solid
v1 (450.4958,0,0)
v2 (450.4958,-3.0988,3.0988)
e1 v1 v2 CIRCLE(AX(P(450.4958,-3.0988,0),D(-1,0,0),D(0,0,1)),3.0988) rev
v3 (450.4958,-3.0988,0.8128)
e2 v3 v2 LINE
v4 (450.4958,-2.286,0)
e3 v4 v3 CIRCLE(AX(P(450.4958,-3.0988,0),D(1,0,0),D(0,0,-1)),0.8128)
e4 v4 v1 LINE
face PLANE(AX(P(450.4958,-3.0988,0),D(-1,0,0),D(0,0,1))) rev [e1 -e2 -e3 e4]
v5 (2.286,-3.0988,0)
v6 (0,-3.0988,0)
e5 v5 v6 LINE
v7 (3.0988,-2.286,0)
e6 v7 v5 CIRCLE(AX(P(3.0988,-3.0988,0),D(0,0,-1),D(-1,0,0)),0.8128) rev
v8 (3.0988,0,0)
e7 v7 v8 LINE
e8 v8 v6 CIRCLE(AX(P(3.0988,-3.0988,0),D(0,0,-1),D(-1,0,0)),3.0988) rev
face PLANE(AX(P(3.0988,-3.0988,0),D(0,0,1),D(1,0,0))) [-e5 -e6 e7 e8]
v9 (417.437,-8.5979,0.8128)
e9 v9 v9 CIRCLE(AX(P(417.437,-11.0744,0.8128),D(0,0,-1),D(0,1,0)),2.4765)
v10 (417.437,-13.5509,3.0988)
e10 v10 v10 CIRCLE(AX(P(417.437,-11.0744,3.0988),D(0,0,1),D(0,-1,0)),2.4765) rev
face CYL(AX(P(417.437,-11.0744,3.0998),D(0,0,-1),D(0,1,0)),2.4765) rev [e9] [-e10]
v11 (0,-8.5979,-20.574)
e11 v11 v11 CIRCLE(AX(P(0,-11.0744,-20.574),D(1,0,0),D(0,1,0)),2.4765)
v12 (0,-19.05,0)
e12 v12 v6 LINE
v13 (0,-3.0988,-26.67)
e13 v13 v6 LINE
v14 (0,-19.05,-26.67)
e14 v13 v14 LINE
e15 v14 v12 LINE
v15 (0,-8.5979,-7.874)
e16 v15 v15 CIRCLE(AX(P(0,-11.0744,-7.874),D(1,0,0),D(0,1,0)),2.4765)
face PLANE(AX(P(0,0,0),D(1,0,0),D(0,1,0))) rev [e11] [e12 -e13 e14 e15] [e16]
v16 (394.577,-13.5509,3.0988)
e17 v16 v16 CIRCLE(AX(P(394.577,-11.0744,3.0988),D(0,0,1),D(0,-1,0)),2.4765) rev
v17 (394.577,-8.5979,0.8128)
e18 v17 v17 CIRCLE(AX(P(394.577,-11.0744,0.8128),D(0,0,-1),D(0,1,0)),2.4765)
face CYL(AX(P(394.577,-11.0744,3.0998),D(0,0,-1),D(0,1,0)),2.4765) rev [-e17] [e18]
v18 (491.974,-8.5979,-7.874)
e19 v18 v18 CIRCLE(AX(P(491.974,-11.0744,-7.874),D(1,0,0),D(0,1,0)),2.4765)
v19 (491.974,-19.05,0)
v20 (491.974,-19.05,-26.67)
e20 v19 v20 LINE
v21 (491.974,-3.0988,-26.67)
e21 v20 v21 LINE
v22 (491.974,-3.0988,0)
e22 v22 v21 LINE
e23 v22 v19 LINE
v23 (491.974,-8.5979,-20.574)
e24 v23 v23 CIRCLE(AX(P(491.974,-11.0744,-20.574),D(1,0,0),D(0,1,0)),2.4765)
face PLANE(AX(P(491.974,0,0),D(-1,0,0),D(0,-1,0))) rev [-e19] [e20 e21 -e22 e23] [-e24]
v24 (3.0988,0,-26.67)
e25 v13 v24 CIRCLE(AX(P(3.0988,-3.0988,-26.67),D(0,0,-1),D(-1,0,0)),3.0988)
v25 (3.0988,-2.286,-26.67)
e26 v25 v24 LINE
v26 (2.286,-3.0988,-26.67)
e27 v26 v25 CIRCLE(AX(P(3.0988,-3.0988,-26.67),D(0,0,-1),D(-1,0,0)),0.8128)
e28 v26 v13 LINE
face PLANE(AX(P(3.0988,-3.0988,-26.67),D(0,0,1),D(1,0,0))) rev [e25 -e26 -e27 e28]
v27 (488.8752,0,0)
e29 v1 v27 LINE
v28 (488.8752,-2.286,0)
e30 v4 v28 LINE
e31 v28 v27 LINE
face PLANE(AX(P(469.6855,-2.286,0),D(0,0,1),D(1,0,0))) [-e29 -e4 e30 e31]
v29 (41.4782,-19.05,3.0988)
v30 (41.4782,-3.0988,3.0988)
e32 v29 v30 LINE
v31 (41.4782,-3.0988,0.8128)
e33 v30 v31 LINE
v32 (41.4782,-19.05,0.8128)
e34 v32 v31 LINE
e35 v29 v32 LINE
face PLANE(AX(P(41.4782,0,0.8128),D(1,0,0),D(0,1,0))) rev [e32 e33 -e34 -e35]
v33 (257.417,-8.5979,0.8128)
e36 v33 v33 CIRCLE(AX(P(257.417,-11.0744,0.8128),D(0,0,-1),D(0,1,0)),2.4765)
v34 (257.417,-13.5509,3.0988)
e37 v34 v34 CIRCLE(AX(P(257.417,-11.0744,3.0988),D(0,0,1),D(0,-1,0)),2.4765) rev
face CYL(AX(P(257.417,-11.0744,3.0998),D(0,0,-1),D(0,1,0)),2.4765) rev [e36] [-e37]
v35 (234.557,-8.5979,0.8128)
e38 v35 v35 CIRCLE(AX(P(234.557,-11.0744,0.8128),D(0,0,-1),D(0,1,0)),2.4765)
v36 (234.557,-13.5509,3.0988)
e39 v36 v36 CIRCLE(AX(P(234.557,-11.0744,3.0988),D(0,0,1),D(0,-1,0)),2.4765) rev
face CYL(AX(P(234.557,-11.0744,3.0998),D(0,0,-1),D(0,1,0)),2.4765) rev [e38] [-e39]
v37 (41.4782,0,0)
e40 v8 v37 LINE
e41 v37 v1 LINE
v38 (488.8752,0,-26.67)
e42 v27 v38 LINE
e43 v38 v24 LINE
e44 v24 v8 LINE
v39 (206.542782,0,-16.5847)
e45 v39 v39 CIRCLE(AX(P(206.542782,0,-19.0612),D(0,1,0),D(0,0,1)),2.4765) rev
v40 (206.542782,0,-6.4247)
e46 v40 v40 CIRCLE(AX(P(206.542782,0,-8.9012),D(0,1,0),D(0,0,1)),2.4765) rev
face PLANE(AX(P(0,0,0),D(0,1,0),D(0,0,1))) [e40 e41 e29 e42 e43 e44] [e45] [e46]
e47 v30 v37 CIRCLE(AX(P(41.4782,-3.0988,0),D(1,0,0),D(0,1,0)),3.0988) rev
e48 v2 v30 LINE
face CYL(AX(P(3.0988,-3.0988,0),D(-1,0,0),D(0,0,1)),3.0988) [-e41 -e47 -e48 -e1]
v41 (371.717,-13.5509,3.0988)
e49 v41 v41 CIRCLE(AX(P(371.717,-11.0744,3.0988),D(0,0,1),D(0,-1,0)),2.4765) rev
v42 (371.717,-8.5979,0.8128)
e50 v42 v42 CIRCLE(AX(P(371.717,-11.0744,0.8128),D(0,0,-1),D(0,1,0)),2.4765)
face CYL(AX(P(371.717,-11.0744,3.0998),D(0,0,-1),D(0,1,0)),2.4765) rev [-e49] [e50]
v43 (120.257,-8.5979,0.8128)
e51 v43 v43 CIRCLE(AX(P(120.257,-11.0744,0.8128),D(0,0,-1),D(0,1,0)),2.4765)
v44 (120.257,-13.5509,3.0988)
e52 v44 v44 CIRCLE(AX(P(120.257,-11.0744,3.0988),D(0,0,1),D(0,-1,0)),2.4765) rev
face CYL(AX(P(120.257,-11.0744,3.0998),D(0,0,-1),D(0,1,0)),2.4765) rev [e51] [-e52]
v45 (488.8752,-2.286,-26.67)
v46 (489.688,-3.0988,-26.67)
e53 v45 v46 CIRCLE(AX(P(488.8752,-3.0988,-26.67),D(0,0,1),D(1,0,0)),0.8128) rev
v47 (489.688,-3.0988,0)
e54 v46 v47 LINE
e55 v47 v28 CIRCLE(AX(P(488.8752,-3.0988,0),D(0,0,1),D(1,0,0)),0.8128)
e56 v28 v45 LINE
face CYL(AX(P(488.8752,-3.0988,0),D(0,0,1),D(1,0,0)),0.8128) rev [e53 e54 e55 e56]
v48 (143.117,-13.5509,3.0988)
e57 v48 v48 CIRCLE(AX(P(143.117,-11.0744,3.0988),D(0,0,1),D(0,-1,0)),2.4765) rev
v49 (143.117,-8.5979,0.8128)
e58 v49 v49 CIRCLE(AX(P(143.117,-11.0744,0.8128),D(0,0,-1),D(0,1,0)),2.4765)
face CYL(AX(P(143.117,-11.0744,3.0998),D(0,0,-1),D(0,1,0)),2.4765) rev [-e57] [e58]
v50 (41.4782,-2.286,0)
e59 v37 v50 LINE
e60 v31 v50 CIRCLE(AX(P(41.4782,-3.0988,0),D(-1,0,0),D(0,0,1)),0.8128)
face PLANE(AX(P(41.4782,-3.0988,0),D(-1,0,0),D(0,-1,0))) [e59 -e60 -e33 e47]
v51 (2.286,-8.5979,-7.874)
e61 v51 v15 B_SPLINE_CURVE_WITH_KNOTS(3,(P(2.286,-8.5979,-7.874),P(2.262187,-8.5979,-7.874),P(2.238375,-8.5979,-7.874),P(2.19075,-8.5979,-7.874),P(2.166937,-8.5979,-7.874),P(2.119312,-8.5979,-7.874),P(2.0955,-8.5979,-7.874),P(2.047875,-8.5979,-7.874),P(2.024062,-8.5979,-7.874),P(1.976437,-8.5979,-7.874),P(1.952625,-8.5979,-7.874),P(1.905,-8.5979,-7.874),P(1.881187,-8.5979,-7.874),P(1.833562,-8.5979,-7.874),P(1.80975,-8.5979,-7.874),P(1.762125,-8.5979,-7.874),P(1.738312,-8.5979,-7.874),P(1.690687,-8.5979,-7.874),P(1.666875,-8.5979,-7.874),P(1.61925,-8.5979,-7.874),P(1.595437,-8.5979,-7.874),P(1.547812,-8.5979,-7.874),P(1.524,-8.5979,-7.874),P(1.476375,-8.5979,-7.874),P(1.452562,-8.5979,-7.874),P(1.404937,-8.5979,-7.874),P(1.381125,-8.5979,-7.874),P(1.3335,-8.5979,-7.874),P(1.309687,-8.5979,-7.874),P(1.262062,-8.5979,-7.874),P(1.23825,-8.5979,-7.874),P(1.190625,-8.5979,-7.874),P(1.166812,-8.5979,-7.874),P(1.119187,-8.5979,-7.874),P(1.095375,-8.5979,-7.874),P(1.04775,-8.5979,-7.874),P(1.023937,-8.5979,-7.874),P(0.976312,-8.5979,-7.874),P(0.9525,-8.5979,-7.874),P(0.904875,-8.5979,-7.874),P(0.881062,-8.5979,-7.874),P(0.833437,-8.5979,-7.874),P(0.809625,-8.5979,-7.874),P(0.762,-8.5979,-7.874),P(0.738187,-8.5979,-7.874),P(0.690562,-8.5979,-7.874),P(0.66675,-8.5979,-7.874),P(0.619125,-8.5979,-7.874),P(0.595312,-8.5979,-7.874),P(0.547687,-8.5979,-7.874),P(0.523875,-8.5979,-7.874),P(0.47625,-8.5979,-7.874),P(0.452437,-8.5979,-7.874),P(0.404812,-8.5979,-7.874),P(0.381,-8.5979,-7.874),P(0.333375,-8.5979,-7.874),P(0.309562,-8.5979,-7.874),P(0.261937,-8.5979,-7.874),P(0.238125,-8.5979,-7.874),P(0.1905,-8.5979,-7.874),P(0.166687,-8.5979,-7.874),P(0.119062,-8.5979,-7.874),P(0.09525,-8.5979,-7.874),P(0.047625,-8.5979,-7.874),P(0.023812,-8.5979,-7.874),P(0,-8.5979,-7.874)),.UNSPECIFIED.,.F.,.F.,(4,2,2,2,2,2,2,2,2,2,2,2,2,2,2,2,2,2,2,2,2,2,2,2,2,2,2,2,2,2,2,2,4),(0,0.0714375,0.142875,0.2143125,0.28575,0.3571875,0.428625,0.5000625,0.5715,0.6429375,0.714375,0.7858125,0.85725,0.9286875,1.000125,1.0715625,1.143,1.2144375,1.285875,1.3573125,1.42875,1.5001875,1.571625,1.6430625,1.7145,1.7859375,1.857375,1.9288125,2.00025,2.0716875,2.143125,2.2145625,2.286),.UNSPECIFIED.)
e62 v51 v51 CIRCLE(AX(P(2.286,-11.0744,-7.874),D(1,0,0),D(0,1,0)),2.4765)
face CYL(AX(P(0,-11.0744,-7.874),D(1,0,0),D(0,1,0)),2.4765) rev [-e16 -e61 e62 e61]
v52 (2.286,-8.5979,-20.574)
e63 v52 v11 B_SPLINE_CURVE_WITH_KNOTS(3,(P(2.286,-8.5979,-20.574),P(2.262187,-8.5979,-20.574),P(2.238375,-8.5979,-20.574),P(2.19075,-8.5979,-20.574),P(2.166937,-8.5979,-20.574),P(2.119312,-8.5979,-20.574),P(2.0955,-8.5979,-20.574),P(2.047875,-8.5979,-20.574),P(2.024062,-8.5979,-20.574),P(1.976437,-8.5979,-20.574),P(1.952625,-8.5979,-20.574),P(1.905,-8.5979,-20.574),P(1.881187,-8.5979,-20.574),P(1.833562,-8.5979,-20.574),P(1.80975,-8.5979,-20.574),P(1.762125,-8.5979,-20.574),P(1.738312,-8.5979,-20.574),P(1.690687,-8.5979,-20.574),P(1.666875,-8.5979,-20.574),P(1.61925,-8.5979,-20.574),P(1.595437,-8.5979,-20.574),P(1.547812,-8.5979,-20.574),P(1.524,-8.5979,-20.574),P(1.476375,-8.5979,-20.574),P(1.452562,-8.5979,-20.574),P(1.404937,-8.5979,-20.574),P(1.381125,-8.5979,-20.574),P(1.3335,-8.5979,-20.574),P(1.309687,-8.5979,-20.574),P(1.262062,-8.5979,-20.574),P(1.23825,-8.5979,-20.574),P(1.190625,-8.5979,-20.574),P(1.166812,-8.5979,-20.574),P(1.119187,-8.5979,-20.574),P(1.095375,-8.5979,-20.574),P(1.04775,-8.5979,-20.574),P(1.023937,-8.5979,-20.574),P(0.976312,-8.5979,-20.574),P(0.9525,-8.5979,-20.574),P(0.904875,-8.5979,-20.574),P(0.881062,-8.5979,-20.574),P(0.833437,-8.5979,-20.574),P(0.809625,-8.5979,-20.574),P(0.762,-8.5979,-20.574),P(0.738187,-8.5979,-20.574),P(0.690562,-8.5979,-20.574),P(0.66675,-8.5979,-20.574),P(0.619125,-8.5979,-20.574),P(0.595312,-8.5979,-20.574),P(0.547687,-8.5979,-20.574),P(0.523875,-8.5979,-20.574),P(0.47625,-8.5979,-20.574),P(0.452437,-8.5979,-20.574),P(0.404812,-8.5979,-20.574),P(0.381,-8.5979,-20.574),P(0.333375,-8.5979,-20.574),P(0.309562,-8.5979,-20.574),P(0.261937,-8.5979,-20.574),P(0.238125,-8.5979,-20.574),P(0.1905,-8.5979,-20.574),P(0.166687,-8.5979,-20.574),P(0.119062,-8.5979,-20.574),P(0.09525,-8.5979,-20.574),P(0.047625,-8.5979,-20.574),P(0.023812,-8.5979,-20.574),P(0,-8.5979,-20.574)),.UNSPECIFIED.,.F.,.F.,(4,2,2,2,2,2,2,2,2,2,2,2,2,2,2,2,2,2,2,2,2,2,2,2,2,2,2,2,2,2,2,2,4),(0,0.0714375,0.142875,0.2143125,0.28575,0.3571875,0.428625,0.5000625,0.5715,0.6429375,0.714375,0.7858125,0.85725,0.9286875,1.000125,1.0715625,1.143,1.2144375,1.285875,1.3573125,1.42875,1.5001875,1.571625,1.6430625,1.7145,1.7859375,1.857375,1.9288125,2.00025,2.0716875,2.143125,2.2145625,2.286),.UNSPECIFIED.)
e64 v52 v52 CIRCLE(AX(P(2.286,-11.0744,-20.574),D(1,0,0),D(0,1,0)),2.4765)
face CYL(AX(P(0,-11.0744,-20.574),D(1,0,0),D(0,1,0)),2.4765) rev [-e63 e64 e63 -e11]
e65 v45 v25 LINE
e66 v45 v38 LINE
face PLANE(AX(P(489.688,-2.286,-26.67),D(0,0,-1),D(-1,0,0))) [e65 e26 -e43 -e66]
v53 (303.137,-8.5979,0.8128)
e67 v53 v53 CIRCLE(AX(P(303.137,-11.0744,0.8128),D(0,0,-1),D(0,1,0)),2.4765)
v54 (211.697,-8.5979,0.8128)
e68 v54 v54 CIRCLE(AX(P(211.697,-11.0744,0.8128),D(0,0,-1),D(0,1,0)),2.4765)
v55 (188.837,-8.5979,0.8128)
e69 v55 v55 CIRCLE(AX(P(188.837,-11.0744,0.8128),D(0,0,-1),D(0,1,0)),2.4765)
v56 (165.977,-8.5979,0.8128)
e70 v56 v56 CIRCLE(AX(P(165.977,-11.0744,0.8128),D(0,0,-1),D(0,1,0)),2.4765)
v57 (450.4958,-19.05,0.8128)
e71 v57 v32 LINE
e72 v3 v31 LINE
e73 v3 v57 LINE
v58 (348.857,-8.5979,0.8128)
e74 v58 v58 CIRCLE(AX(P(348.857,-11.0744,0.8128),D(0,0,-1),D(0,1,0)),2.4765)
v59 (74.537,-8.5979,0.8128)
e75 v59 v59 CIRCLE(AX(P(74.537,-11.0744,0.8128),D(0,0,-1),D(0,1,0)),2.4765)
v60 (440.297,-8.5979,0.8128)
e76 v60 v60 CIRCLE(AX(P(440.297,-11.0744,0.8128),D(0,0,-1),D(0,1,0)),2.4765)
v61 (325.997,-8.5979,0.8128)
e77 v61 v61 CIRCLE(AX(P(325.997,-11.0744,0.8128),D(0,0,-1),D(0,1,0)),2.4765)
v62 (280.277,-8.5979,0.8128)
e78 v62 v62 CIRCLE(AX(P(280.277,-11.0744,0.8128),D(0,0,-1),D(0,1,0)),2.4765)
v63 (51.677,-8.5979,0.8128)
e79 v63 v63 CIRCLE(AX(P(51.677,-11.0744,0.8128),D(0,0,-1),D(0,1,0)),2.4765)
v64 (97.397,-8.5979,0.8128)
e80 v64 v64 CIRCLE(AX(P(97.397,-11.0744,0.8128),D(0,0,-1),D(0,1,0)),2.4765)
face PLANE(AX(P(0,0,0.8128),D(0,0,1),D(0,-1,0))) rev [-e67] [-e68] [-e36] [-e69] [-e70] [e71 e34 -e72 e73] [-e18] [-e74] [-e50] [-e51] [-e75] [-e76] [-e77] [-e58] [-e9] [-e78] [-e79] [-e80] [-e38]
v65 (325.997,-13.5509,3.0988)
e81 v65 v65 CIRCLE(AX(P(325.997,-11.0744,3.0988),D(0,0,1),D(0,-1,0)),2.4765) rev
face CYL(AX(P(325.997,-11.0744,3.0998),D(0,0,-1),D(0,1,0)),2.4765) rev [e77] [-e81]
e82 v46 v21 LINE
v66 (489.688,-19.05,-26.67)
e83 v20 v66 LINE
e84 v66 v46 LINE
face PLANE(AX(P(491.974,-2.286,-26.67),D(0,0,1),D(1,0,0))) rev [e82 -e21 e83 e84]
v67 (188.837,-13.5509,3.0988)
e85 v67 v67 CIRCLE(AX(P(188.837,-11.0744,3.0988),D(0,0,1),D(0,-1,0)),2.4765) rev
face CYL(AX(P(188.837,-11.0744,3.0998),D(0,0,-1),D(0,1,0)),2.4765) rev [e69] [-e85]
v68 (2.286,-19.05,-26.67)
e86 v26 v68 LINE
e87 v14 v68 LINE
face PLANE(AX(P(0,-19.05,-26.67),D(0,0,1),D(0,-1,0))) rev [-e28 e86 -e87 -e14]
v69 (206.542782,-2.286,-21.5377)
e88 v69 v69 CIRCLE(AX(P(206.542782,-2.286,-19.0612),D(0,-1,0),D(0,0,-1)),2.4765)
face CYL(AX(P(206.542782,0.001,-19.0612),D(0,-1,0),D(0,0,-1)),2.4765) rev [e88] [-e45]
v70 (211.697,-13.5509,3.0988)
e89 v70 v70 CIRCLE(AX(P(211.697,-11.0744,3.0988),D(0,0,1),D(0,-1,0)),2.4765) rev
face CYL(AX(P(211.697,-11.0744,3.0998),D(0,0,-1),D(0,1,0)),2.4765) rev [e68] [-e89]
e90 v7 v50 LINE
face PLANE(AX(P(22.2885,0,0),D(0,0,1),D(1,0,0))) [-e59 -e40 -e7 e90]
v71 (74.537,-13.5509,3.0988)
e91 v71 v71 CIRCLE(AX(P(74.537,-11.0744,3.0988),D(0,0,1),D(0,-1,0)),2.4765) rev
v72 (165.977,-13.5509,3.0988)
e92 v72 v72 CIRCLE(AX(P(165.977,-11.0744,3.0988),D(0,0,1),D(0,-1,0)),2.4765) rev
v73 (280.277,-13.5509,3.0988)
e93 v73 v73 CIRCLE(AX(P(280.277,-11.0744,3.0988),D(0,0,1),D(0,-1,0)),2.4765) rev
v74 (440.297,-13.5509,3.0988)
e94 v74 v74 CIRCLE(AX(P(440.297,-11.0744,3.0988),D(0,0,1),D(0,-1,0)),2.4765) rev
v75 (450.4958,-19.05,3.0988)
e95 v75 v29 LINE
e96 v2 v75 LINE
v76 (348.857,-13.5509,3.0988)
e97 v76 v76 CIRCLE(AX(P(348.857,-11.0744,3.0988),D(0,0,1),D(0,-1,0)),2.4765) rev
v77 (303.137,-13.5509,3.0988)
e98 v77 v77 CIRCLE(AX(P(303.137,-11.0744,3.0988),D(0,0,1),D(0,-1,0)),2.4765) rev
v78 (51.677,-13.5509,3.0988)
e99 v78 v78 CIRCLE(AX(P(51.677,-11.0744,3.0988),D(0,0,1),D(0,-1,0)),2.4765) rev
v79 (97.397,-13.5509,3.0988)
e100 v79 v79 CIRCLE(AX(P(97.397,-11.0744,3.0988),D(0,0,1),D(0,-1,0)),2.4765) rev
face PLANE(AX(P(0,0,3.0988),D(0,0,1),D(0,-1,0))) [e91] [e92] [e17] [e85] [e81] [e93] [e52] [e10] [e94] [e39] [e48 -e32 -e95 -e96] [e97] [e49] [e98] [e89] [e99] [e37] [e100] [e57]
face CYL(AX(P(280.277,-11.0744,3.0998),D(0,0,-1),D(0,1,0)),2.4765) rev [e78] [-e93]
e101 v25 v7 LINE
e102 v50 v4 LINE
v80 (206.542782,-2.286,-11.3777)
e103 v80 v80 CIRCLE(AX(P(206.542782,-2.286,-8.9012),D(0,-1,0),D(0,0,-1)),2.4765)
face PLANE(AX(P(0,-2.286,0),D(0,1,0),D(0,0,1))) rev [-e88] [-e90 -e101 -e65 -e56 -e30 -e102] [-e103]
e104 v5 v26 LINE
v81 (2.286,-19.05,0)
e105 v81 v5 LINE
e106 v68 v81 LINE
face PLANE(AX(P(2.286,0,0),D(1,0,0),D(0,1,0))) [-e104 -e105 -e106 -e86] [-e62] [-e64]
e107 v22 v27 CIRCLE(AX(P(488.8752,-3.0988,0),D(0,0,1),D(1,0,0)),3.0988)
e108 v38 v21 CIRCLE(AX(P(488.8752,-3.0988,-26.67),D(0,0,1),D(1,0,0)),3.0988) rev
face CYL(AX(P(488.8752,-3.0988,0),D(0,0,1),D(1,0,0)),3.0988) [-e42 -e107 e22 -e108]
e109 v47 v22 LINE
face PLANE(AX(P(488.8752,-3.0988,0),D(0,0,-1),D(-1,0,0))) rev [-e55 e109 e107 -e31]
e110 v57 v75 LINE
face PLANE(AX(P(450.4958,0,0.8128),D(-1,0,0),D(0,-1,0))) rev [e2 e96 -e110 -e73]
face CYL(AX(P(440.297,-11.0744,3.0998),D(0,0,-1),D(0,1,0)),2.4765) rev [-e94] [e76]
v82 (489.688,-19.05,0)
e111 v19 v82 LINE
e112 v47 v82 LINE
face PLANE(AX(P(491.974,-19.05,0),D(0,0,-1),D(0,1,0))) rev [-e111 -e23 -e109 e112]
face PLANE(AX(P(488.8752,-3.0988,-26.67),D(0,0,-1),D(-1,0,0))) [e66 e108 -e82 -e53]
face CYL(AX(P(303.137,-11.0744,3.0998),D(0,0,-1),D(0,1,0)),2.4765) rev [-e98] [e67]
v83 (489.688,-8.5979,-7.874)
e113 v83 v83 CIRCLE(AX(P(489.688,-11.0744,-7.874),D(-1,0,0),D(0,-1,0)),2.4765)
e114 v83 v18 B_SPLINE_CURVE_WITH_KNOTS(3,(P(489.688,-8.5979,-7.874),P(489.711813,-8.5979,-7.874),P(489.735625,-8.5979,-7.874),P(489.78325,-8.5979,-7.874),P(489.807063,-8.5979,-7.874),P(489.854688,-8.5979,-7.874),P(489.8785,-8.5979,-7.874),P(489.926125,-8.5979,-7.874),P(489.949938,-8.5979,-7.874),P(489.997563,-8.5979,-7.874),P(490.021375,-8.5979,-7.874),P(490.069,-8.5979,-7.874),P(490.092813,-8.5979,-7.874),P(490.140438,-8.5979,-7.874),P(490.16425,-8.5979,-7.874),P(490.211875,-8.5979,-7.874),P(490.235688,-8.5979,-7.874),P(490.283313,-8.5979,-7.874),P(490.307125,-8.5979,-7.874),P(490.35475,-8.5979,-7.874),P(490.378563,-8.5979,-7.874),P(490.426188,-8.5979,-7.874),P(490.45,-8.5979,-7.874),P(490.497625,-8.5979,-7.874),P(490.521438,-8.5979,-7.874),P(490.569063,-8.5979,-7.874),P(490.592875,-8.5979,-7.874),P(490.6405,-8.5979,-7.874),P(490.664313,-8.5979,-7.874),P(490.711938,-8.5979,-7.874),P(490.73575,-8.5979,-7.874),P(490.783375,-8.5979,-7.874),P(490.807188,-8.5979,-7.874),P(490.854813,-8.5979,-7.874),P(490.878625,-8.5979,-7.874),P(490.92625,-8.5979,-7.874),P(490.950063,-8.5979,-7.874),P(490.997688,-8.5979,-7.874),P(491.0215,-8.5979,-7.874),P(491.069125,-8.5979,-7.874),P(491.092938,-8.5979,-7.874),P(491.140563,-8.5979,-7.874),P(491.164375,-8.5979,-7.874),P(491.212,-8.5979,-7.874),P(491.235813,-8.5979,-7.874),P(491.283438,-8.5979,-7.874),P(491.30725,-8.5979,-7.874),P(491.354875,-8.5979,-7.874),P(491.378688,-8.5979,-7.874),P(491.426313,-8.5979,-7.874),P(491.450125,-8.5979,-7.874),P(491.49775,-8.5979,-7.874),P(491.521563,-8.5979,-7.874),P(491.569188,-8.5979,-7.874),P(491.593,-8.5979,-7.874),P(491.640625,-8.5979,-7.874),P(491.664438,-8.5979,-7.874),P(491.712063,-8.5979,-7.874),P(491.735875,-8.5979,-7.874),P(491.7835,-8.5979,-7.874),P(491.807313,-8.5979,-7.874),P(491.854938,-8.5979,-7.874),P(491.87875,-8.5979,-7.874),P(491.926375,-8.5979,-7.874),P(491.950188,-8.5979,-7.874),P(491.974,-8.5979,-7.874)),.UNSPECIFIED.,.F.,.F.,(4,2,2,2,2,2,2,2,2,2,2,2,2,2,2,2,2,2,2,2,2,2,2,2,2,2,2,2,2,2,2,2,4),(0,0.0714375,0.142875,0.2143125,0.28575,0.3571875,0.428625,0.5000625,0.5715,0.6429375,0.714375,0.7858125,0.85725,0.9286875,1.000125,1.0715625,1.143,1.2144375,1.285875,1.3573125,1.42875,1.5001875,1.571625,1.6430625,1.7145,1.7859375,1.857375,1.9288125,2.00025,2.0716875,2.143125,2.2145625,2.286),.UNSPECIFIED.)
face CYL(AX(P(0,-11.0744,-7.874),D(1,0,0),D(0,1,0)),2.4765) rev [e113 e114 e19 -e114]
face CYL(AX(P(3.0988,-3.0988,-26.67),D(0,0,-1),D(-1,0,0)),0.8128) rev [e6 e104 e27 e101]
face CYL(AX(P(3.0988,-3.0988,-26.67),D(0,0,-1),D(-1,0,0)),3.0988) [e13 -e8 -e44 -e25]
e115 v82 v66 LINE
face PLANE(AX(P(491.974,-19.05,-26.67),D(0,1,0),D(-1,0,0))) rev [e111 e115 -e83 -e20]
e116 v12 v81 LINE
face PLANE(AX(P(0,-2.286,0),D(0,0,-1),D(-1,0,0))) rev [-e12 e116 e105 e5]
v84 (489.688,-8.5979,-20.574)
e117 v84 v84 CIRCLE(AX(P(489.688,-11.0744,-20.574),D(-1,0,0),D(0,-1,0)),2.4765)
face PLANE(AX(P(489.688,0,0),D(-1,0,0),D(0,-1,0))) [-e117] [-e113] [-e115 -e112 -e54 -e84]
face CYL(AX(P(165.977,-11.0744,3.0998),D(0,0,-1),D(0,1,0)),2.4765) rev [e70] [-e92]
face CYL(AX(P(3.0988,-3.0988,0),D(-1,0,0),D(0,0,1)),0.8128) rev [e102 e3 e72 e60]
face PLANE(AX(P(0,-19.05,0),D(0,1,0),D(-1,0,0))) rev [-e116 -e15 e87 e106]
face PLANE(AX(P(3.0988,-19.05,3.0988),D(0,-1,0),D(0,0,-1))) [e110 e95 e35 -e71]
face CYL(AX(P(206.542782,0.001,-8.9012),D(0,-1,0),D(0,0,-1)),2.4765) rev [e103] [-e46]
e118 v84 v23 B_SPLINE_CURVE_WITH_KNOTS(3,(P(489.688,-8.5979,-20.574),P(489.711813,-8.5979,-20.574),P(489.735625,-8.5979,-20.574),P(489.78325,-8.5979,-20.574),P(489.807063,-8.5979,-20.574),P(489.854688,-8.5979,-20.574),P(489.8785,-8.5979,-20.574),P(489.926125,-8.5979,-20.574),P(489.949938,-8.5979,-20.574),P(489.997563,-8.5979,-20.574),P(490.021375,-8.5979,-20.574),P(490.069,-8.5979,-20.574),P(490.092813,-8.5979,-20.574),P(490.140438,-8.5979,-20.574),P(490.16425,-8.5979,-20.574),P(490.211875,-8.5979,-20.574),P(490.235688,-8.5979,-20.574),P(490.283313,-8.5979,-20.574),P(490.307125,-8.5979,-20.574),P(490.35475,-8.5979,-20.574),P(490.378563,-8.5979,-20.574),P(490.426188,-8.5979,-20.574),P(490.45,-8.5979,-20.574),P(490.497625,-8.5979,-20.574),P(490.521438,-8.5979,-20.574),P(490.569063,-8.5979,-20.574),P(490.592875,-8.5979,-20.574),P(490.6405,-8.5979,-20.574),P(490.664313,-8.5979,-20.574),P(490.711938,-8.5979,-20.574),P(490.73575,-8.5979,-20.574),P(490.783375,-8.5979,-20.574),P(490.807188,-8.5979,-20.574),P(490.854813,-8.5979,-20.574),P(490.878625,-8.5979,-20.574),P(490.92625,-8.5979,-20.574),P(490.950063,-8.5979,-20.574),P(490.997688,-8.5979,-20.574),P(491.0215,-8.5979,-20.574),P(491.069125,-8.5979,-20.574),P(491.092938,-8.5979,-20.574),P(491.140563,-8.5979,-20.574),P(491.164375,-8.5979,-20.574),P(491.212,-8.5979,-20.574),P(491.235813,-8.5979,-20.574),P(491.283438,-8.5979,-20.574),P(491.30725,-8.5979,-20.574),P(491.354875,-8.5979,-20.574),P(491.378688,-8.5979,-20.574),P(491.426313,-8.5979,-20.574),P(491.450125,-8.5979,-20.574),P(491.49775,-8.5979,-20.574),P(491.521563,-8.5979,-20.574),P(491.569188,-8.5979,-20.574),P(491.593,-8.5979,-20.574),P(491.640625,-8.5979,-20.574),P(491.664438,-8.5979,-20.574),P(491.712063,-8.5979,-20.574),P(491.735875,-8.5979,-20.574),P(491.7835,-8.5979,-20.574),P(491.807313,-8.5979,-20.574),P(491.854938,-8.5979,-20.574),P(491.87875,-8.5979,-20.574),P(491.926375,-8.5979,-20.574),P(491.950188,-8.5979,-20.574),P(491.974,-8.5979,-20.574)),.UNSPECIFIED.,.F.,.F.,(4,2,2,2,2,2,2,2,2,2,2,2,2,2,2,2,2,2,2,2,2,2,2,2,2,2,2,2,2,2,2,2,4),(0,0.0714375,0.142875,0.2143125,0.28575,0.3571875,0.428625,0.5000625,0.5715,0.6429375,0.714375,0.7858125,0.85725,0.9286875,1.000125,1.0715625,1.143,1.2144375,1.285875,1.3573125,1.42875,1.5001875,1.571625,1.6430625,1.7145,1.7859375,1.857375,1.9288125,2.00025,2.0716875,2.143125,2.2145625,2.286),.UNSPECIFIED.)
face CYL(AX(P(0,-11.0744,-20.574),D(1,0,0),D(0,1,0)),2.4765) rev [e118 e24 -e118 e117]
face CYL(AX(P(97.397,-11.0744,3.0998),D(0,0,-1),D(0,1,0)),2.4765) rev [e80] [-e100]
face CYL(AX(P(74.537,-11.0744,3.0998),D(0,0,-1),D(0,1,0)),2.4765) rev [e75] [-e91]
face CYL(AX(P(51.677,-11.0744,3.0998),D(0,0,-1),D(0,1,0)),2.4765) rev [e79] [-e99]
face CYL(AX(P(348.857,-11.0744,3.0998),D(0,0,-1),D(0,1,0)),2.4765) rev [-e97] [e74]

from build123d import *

# Parameters (mm, degrees)
SKETCH1_W                    = 489.688000048
SKETCH1_H                    = 26.67
BASE_FLANGE1_DEPTH           = 2.286
EDGE_FLANGE2_STRIP_W         = 10.7696
EDGE_FLANGE2_STRIP_H         = 2.286
EDGE_FLANGE2_STRIP_CUT_DEPTH = 26.67
EDGE_FLANGE2_DEPTH           = 26.67
EDGE_FLANGE3_STRIP_W         = 10.7696
EDGE_FLANGE3_STRIP_H         = 2.286
EDGE_FLANGE3_STRIP_CUT_DEPTH = 26.67
EDGE_FLANGE3_DEPTH           = 26.67
EDGE_FLANGE1_DEPTH           = 485.776400048
SKETCH16_R                   = 2.4765
CUT_EXTRUDE1_DEPTH           = 494.064507061
CUT_EXTRUDE2_DEPTH           = 0.8128
CUT_EXTRUDE2_DEPTH_BACK      = 2.54
SKETCH17_W                   = 38.3794
SKETCH17_H                   = 19.05
CUT_EXTRUDE3_REACH           = 495.109
SKETCH18_R                   = 2.4765
CUT_EXTRUDE4_REACH           = 494.981
SKETCH19_R                   = 2.4765


# Sheet-metal steps are written as plain solids
with BuildPart() as part:
    # Sketch1 → Base-Flange1 (new body)
    with BuildSketch(Plane(origin=(0, 0, 0), x_dir=(1, 0, 0), z_dir=(0, 1, 0))):
        with Locations((244.844000024, 13.335)):
            Rectangle(SKETCH1_W, SKETCH1_H)
    extrude(amount=-BASE_FLANGE1_DEPTH)

    # Edge-Flange2 strip (across the edge) → Edge-Flange2 strip cut (cut)
    with BuildSketch(Plane(origin=(0, -2.286, 0), x_dir=(1, 0, 0), z_dir=(0, 0, -1))):
        with Locations((-2.286, -1.143)):
            Rectangle(EDGE_FLANGE2_STRIP_W, EDGE_FLANGE2_STRIP_H)
    extrude(amount=EDGE_FLANGE2_STRIP_CUT_DEPTH, mode=Mode.SUBTRACT)

    # Edge-Flange2 section (across the edge) → Edge-Flange2 (add)
    with BuildSketch(Plane(origin=(0, -2.286, 0), x_dir=(1, 0, 0), z_dir=(0, 0, -1))):
        with BuildLine():
            Line((0, 0.8128), (0, 16.764))
            Line((0, 16.764), (2.286, 16.764))
            Line((2.286, 16.764), (2.286, 0.8128))
            ThreePointArc((2.286, 0.8128), (2.524063608, 0.238063608), (3.0988, 0))
            Line((3.0988, 0), (3.0988, -2.286))
            ThreePointArc((3.0988, -2.286), (0.907617506, -1.378382494), (0, 0.8128))
        make_face()
    extrude(amount=EDGE_FLANGE2_DEPTH)

    # Edge-Flange3 strip (across the edge) → Edge-Flange3 strip cut (cut)
    with BuildSketch(Plane(origin=(489.688000048, -2.286, -26.67), x_dir=(-1, 0, 0), z_dir=(0, 0, 1))):
        with Locations((-4.572, -1.143)):
            Rectangle(EDGE_FLANGE3_STRIP_W, EDGE_FLANGE3_STRIP_H)
    extrude(amount=EDGE_FLANGE3_STRIP_CUT_DEPTH, mode=Mode.SUBTRACT)

    # Edge-Flange3 section (across the edge) → Edge-Flange3 (add)
    with BuildSketch(Plane(origin=(489.688000048, -2.286, -26.67), x_dir=(-1, 0, 0), z_dir=(0, 0, 1))):
        with BuildLine():
            Line((-2.286, 0.8128), (-2.286, 16.764))
            Line((-2.286, 16.764), (0, 16.764))
            Line((0, 16.764), (0, 0.8128))
            ThreePointArc((0, 0.8128), (0.238063608, 0.238063608), (0.8128, 0))
            Line((0.8128, 0), (0.8128, -2.286))
            ThreePointArc((0.8128, -2.286), (-1.378382494, -1.378382494), (-2.286, 0.8128))
        make_face()
    extrude(amount=EDGE_FLANGE3_DEPTH)

    # Edge-Flange1 section (across the edge) → Edge-Flange1 (add)
    with BuildSketch(Plane(origin=(488.875200048, -2.286, 0.8128), x_dir=(0, 0, -1), z_dir=(-1, 0, 0))):
        with BuildLine():
            Line((-2.286, 0.8128), (-2.286, 16.764))
            Line((-2.286, 16.764), (0, 16.764))
            Line((0, 16.764), (0, 0.8128))
            ThreePointArc((0, 0.8128), (0.238063608, 0.238063608), (0.8128, 0))
            Line((0.8128, 0), (0.8128, -2.286))
            ThreePointArc((0.8128, -2.286), (-1.378382494, -1.378382494), (-2.286, 0.8128))
        make_face()
    extrude(amount=EDGE_FLANGE1_DEPTH)

    # Sketch16 → Cut-Extrude1 (cut, through all)
    with BuildSketch(Plane(origin=(491.974000048, 0, 0), x_dir=(0, 0, -1), z_dir=(1, 0, 0))):
        with Locations(Location((7.874, -11.0744, 0), (0, 0, 90))):
            Circle(SKETCH16_R)
        with Locations(Location((20.574, -11.0744, 0), (0, 0, 90))):
            Circle(SKETCH16_R)
    extrude(amount=-CUT_EXTRUDE1_DEPTH, mode=Mode.SUBTRACT)

    # Sketch17 → Cut-Extrude2 (cut, two sides: drawn at the far end of the back side and taken through both)
    with BuildSketch(Plane(origin=(0, 0, 0.8128), x_dir=(-1, 0, 0), z_dir=(0, 0, -1)).offset(-CUT_EXTRUDE2_DEPTH_BACK)):
        with Locations((-22.2885, -9.525)):
            Rectangle(SKETCH17_W, SKETCH17_H)
        with Locations((-469.685500048, -9.525)):
            Rectangle(SKETCH17_W, SKETCH17_H)
    extrude(amount=CUT_EXTRUDE2_DEPTH + CUT_EXTRUDE2_DEPTH_BACK, mode=Mode.SUBTRACT)

    # Sketch18 → Cut-Extrude3 (cut, up to next)
    with BuildSketch(Plane(origin=(0, 0, 0.8128), x_dir=(-1, 0, 0), z_dir=(0, 0, -1)), mode=Mode.PRIVATE) as cut_extrude3_sk1:
        with Locations(Location((-440.297000024, -11.0744, 0), (0, 0, 90))):
            Circle(SKETCH18_R)
    cut_extrude3_tool1 = extrude(cut_extrude3_sk1.sketch, amount=-CUT_EXTRUDE3_REACH, mode=Mode.PRIVATE) & part.part
    # Sketch18 → Cut-Extrude3 (cut, up to next)
    with BuildSketch(Plane(origin=(0, 0, 0.8128), x_dir=(-1, 0, 0), z_dir=(0, 0, -1)), mode=Mode.PRIVATE) as cut_extrude3_sk2:
        with Locations(Location((-417.437000024, -11.0744, 0), (0, 0, 90))):
            Circle(SKETCH18_R)
    cut_extrude3_tool2 = extrude(cut_extrude3_sk2.sketch, amount=-CUT_EXTRUDE3_REACH, mode=Mode.PRIVATE) & part.part
    # Sketch18 → Cut-Extrude3 (cut, up to next)
    with BuildSketch(Plane(origin=(0, 0, 0.8128), x_dir=(-1, 0, 0), z_dir=(0, 0, -1)), mode=Mode.PRIVATE) as cut_extrude3_sk3:
        with Locations(Location((-394.577000024, -11.0744, 0), (0, 0, 90))):
            Circle(SKETCH18_R)
    cut_extrude3_tool3 = extrude(cut_extrude3_sk3.sketch, amount=-CUT_EXTRUDE3_REACH, mode=Mode.PRIVATE) & part.part
    # Sketch18 → Cut-Extrude3 (cut, up to next)
    with BuildSketch(Plane(origin=(0, 0, 0.8128), x_dir=(-1, 0, 0), z_dir=(0, 0, -1)), mode=Mode.PRIVATE) as cut_extrude3_sk4:
        with Locations(Location((-371.717000024, -11.0744, 0), (0, 0, 90))):
            Circle(SKETCH18_R)
    cut_extrude3_tool4 = extrude(cut_extrude3_sk4.sketch, amount=-CUT_EXTRUDE3_REACH, mode=Mode.PRIVATE) & part.part
    # Sketch18 → Cut-Extrude3 (cut, up to next)
    with BuildSketch(Plane(origin=(0, 0, 0.8128), x_dir=(-1, 0, 0), z_dir=(0, 0, -1)), mode=Mode.PRIVATE) as cut_extrude3_sk5:
        with Locations(Location((-348.857000024, -11.0744, 0), (0, 0, 90))):
            Circle(SKETCH18_R)
    cut_extrude3_tool5 = extrude(cut_extrude3_sk5.sketch, amount=-CUT_EXTRUDE3_REACH, mode=Mode.PRIVATE) & part.part
    # Sketch18 → Cut-Extrude3 (cut, up to next)
    with BuildSketch(Plane(origin=(0, 0, 0.8128), x_dir=(-1, 0, 0), z_dir=(0, 0, -1)), mode=Mode.PRIVATE) as cut_extrude3_sk6:
        with Locations(Location((-325.997000024, -11.0744, 0), (0, 0, 90))):
            Circle(SKETCH18_R)
    cut_extrude3_tool6 = extrude(cut_extrude3_sk6.sketch, amount=-CUT_EXTRUDE3_REACH, mode=Mode.PRIVATE) & part.part
    # Sketch18 → Cut-Extrude3 (cut, up to next)
    with BuildSketch(Plane(origin=(0, 0, 0.8128), x_dir=(-1, 0, 0), z_dir=(0, 0, -1)), mode=Mode.PRIVATE) as cut_extrude3_sk7:
        with Locations(Location((-303.137000024, -11.0744, 0), (0, 0, 90))):
            Circle(SKETCH18_R)
    cut_extrude3_tool7 = extrude(cut_extrude3_sk7.sketch, amount=-CUT_EXTRUDE3_REACH, mode=Mode.PRIVATE) & part.part
    # Sketch18 → Cut-Extrude3 (cut, up to next)
    with BuildSketch(Plane(origin=(0, 0, 0.8128), x_dir=(-1, 0, 0), z_dir=(0, 0, -1)), mode=Mode.PRIVATE) as cut_extrude3_sk8:
        with Locations(Location((-280.277000024, -11.0744, 0), (0, 0, 90))):
            Circle(SKETCH18_R)
    cut_extrude3_tool8 = extrude(cut_extrude3_sk8.sketch, amount=-CUT_EXTRUDE3_REACH, mode=Mode.PRIVATE) & part.part
    # Sketch18 → Cut-Extrude3 (cut, up to next)
    with BuildSketch(Plane(origin=(0, 0, 0.8128), x_dir=(-1, 0, 0), z_dir=(0, 0, -1)), mode=Mode.PRIVATE) as cut_extrude3_sk9:
        with Locations(Location((-257.417000024, -11.0744, 0), (0, 0, 90))):
            Circle(SKETCH18_R)
    cut_extrude3_tool9 = extrude(cut_extrude3_sk9.sketch, amount=-CUT_EXTRUDE3_REACH, mode=Mode.PRIVATE) & part.part
    # Sketch18 → Cut-Extrude3 (cut, up to next)
    with BuildSketch(Plane(origin=(0, 0, 0.8128), x_dir=(-1, 0, 0), z_dir=(0, 0, -1)), mode=Mode.PRIVATE) as cut_extrude3_sk10:
        with Locations(Location((-234.557000024, -11.0744, 0), (0, 0, 90))):
            Circle(SKETCH18_R)
    cut_extrude3_tool10 = extrude(cut_extrude3_sk10.sketch, amount=-CUT_EXTRUDE3_REACH, mode=Mode.PRIVATE) & part.part
    # Sketch18 → Cut-Extrude3 (cut, up to next)
    with BuildSketch(Plane(origin=(0, 0, 0.8128), x_dir=(-1, 0, 0), z_dir=(0, 0, -1)), mode=Mode.PRIVATE) as cut_extrude3_sk11:
        with Locations(Location((-211.697000024, -11.0744, 0), (0, 0, 90))):
            Circle(SKETCH18_R)
    cut_extrude3_tool11 = extrude(cut_extrude3_sk11.sketch, amount=-CUT_EXTRUDE3_REACH, mode=Mode.PRIVATE) & part.part
    # Sketch18 → Cut-Extrude3 (cut, up to next)
    with BuildSketch(Plane(origin=(0, 0, 0.8128), x_dir=(-1, 0, 0), z_dir=(0, 0, -1)), mode=Mode.PRIVATE) as cut_extrude3_sk12:
        with Locations(Location((-188.837000024, -11.0744, 0), (0, 0, 90))):
            Circle(SKETCH18_R)
    cut_extrude3_tool12 = extrude(cut_extrude3_sk12.sketch, amount=-CUT_EXTRUDE3_REACH, mode=Mode.PRIVATE) & part.part
    # Sketch18 → Cut-Extrude3 (cut, up to next)
    with BuildSketch(Plane(origin=(0, 0, 0.8128), x_dir=(-1, 0, 0), z_dir=(0, 0, -1)), mode=Mode.PRIVATE) as cut_extrude3_sk13:
        with Locations(Location((-165.977000024, -11.0744, 0), (0, 0, 90))):
            Circle(SKETCH18_R)
    cut_extrude3_tool13 = extrude(cut_extrude3_sk13.sketch, amount=-CUT_EXTRUDE3_REACH, mode=Mode.PRIVATE) & part.part
    # Sketch18 → Cut-Extrude3 (cut, up to next)
    with BuildSketch(Plane(origin=(0, 0, 0.8128), x_dir=(-1, 0, 0), z_dir=(0, 0, -1)), mode=Mode.PRIVATE) as cut_extrude3_sk14:
        with Locations(Location((-143.117000024, -11.0744, 0), (0, 0, 90))):
            Circle(SKETCH18_R)
    cut_extrude3_tool14 = extrude(cut_extrude3_sk14.sketch, amount=-CUT_EXTRUDE3_REACH, mode=Mode.PRIVATE) & part.part
    # Sketch18 → Cut-Extrude3 (cut, up to next)
    with BuildSketch(Plane(origin=(0, 0, 0.8128), x_dir=(-1, 0, 0), z_dir=(0, 0, -1)), mode=Mode.PRIVATE) as cut_extrude3_sk15:
        with Locations(Location((-120.257000024, -11.0744, 0), (0, 0, 90))):
            Circle(SKETCH18_R)
    cut_extrude3_tool15 = extrude(cut_extrude3_sk15.sketch, amount=-CUT_EXTRUDE3_REACH, mode=Mode.PRIVATE) & part.part
    # Sketch18 → Cut-Extrude3 (cut, up to next)
    with BuildSketch(Plane(origin=(0, 0, 0.8128), x_dir=(-1, 0, 0), z_dir=(0, 0, -1)), mode=Mode.PRIVATE) as cut_extrude3_sk16:
        with Locations(Location((-97.397000024, -11.0744, 0), (0, 0, 90))):
            Circle(SKETCH18_R)
    cut_extrude3_tool16 = extrude(cut_extrude3_sk16.sketch, amount=-CUT_EXTRUDE3_REACH, mode=Mode.PRIVATE) & part.part
    # Sketch18 → Cut-Extrude3 (cut, up to next)
    with BuildSketch(Plane(origin=(0, 0, 0.8128), x_dir=(-1, 0, 0), z_dir=(0, 0, -1)), mode=Mode.PRIVATE) as cut_extrude3_sk17:
        with Locations(Location((-74.537000024, -11.0744, 0), (0, 0, 90))):
            Circle(SKETCH18_R)
    cut_extrude3_tool17 = extrude(cut_extrude3_sk17.sketch, amount=-CUT_EXTRUDE3_REACH, mode=Mode.PRIVATE) & part.part
    # Sketch18 → Cut-Extrude3 (cut, up to next)
    with BuildSketch(Plane(origin=(0, 0, 0.8128), x_dir=(-1, 0, 0), z_dir=(0, 0, -1)), mode=Mode.PRIVATE) as cut_extrude3_sk18:
        with Locations(Location((-51.677000024, -11.0744, 0), (0, 0, 90))):
            Circle(SKETCH18_R)
    cut_extrude3_tool18 = extrude(cut_extrude3_sk18.sketch, amount=-CUT_EXTRUDE3_REACH, mode=Mode.PRIVATE) & part.part
    add(cut_extrude3_tool1.solids().sort_by_distance((440.297, -11.0744, 0.8128))[0], mode=Mode.SUBTRACT)
    add(cut_extrude3_tool2.solids().sort_by_distance((417.437, -11.0744, 0.8128))[0], mode=Mode.SUBTRACT)
    add(cut_extrude3_tool3.solids().sort_by_distance((394.577, -11.0744, 0.8128))[0], mode=Mode.SUBTRACT)
    add(cut_extrude3_tool4.solids().sort_by_distance((371.717, -11.0744, 0.8128))[0], mode=Mode.SUBTRACT)
    add(cut_extrude3_tool5.solids().sort_by_distance((348.857, -11.0744, 0.8128))[0], mode=Mode.SUBTRACT)
    add(cut_extrude3_tool6.solids().sort_by_distance((325.997, -11.0744, 0.8128))[0], mode=Mode.SUBTRACT)
    add(cut_extrude3_tool7.solids().sort_by_distance((303.137, -11.0744, 0.8128))[0], mode=Mode.SUBTRACT)
    add(cut_extrude3_tool8.solids().sort_by_distance((280.277, -11.0744, 0.8128))[0], mode=Mode.SUBTRACT)
    add(cut_extrude3_tool9.solids().sort_by_distance((257.417, -11.0744, 0.8128))[0], mode=Mode.SUBTRACT)
    add(cut_extrude3_tool10.solids().sort_by_distance((234.557, -11.0744, 0.8128))[0], mode=Mode.SUBTRACT)
    add(cut_extrude3_tool11.solids().sort_by_distance((211.697, -11.0744, 0.8128))[0], mode=Mode.SUBTRACT)
    add(cut_extrude3_tool12.solids().sort_by_distance((188.837, -11.0744, 0.8128))[0], mode=Mode.SUBTRACT)
    add(cut_extrude3_tool13.solids().sort_by_distance((165.977, -11.0744, 0.8128))[0], mode=Mode.SUBTRACT)
    add(cut_extrude3_tool14.solids().sort_by_distance((143.117, -11.0744, 0.8128))[0], mode=Mode.SUBTRACT)
    add(cut_extrude3_tool15.solids().sort_by_distance((120.257, -11.0744, 0.8128))[0], mode=Mode.SUBTRACT)
    add(cut_extrude3_tool16.solids().sort_by_distance((97.397, -11.0744, 0.8128))[0], mode=Mode.SUBTRACT)
    add(cut_extrude3_tool17.solids().sort_by_distance((74.537, -11.0744, 0.8128))[0], mode=Mode.SUBTRACT)
    add(cut_extrude3_tool18.solids().sort_by_distance((51.677, -11.0744, 0.8128))[0], mode=Mode.SUBTRACT)

    # Sketch19 → Cut-Extrude4 (cut, up to next)
    with BuildSketch(Plane.XZ.offset(2.286), mode=Mode.PRIVATE) as cut_extrude4_sk1:
        with Locations(Location((206.542782059, -19.0612, 0), (0, 0, 270))):
            Circle(SKETCH19_R)
    cut_extrude4_tool1 = extrude(cut_extrude4_sk1.sketch, amount=-CUT_EXTRUDE4_REACH, mode=Mode.PRIVATE) & part.part
    # Sketch19 → Cut-Extrude4 (cut, up to next)
    with BuildSketch(Plane.XZ.offset(2.286), mode=Mode.PRIVATE) as cut_extrude4_sk2:
        with Locations(Location((206.542782059, -8.9012, 0), (0, 0, 270))):
            Circle(SKETCH19_R)
    cut_extrude4_tool2 = extrude(cut_extrude4_sk2.sketch, amount=-CUT_EXTRUDE4_REACH, mode=Mode.PRIVATE) & part.part
    add(cut_extrude4_tool1.solids().sort_by_distance((206.542782, -2.286, -19.0612))[0], mode=Mode.SUBTRACT)
    add(cut_extrude4_tool2.solids().sort_by_distance((206.542782, -2.286, -8.9012))[0], mode=Mode.SUBTRACT)


solid = part.part
